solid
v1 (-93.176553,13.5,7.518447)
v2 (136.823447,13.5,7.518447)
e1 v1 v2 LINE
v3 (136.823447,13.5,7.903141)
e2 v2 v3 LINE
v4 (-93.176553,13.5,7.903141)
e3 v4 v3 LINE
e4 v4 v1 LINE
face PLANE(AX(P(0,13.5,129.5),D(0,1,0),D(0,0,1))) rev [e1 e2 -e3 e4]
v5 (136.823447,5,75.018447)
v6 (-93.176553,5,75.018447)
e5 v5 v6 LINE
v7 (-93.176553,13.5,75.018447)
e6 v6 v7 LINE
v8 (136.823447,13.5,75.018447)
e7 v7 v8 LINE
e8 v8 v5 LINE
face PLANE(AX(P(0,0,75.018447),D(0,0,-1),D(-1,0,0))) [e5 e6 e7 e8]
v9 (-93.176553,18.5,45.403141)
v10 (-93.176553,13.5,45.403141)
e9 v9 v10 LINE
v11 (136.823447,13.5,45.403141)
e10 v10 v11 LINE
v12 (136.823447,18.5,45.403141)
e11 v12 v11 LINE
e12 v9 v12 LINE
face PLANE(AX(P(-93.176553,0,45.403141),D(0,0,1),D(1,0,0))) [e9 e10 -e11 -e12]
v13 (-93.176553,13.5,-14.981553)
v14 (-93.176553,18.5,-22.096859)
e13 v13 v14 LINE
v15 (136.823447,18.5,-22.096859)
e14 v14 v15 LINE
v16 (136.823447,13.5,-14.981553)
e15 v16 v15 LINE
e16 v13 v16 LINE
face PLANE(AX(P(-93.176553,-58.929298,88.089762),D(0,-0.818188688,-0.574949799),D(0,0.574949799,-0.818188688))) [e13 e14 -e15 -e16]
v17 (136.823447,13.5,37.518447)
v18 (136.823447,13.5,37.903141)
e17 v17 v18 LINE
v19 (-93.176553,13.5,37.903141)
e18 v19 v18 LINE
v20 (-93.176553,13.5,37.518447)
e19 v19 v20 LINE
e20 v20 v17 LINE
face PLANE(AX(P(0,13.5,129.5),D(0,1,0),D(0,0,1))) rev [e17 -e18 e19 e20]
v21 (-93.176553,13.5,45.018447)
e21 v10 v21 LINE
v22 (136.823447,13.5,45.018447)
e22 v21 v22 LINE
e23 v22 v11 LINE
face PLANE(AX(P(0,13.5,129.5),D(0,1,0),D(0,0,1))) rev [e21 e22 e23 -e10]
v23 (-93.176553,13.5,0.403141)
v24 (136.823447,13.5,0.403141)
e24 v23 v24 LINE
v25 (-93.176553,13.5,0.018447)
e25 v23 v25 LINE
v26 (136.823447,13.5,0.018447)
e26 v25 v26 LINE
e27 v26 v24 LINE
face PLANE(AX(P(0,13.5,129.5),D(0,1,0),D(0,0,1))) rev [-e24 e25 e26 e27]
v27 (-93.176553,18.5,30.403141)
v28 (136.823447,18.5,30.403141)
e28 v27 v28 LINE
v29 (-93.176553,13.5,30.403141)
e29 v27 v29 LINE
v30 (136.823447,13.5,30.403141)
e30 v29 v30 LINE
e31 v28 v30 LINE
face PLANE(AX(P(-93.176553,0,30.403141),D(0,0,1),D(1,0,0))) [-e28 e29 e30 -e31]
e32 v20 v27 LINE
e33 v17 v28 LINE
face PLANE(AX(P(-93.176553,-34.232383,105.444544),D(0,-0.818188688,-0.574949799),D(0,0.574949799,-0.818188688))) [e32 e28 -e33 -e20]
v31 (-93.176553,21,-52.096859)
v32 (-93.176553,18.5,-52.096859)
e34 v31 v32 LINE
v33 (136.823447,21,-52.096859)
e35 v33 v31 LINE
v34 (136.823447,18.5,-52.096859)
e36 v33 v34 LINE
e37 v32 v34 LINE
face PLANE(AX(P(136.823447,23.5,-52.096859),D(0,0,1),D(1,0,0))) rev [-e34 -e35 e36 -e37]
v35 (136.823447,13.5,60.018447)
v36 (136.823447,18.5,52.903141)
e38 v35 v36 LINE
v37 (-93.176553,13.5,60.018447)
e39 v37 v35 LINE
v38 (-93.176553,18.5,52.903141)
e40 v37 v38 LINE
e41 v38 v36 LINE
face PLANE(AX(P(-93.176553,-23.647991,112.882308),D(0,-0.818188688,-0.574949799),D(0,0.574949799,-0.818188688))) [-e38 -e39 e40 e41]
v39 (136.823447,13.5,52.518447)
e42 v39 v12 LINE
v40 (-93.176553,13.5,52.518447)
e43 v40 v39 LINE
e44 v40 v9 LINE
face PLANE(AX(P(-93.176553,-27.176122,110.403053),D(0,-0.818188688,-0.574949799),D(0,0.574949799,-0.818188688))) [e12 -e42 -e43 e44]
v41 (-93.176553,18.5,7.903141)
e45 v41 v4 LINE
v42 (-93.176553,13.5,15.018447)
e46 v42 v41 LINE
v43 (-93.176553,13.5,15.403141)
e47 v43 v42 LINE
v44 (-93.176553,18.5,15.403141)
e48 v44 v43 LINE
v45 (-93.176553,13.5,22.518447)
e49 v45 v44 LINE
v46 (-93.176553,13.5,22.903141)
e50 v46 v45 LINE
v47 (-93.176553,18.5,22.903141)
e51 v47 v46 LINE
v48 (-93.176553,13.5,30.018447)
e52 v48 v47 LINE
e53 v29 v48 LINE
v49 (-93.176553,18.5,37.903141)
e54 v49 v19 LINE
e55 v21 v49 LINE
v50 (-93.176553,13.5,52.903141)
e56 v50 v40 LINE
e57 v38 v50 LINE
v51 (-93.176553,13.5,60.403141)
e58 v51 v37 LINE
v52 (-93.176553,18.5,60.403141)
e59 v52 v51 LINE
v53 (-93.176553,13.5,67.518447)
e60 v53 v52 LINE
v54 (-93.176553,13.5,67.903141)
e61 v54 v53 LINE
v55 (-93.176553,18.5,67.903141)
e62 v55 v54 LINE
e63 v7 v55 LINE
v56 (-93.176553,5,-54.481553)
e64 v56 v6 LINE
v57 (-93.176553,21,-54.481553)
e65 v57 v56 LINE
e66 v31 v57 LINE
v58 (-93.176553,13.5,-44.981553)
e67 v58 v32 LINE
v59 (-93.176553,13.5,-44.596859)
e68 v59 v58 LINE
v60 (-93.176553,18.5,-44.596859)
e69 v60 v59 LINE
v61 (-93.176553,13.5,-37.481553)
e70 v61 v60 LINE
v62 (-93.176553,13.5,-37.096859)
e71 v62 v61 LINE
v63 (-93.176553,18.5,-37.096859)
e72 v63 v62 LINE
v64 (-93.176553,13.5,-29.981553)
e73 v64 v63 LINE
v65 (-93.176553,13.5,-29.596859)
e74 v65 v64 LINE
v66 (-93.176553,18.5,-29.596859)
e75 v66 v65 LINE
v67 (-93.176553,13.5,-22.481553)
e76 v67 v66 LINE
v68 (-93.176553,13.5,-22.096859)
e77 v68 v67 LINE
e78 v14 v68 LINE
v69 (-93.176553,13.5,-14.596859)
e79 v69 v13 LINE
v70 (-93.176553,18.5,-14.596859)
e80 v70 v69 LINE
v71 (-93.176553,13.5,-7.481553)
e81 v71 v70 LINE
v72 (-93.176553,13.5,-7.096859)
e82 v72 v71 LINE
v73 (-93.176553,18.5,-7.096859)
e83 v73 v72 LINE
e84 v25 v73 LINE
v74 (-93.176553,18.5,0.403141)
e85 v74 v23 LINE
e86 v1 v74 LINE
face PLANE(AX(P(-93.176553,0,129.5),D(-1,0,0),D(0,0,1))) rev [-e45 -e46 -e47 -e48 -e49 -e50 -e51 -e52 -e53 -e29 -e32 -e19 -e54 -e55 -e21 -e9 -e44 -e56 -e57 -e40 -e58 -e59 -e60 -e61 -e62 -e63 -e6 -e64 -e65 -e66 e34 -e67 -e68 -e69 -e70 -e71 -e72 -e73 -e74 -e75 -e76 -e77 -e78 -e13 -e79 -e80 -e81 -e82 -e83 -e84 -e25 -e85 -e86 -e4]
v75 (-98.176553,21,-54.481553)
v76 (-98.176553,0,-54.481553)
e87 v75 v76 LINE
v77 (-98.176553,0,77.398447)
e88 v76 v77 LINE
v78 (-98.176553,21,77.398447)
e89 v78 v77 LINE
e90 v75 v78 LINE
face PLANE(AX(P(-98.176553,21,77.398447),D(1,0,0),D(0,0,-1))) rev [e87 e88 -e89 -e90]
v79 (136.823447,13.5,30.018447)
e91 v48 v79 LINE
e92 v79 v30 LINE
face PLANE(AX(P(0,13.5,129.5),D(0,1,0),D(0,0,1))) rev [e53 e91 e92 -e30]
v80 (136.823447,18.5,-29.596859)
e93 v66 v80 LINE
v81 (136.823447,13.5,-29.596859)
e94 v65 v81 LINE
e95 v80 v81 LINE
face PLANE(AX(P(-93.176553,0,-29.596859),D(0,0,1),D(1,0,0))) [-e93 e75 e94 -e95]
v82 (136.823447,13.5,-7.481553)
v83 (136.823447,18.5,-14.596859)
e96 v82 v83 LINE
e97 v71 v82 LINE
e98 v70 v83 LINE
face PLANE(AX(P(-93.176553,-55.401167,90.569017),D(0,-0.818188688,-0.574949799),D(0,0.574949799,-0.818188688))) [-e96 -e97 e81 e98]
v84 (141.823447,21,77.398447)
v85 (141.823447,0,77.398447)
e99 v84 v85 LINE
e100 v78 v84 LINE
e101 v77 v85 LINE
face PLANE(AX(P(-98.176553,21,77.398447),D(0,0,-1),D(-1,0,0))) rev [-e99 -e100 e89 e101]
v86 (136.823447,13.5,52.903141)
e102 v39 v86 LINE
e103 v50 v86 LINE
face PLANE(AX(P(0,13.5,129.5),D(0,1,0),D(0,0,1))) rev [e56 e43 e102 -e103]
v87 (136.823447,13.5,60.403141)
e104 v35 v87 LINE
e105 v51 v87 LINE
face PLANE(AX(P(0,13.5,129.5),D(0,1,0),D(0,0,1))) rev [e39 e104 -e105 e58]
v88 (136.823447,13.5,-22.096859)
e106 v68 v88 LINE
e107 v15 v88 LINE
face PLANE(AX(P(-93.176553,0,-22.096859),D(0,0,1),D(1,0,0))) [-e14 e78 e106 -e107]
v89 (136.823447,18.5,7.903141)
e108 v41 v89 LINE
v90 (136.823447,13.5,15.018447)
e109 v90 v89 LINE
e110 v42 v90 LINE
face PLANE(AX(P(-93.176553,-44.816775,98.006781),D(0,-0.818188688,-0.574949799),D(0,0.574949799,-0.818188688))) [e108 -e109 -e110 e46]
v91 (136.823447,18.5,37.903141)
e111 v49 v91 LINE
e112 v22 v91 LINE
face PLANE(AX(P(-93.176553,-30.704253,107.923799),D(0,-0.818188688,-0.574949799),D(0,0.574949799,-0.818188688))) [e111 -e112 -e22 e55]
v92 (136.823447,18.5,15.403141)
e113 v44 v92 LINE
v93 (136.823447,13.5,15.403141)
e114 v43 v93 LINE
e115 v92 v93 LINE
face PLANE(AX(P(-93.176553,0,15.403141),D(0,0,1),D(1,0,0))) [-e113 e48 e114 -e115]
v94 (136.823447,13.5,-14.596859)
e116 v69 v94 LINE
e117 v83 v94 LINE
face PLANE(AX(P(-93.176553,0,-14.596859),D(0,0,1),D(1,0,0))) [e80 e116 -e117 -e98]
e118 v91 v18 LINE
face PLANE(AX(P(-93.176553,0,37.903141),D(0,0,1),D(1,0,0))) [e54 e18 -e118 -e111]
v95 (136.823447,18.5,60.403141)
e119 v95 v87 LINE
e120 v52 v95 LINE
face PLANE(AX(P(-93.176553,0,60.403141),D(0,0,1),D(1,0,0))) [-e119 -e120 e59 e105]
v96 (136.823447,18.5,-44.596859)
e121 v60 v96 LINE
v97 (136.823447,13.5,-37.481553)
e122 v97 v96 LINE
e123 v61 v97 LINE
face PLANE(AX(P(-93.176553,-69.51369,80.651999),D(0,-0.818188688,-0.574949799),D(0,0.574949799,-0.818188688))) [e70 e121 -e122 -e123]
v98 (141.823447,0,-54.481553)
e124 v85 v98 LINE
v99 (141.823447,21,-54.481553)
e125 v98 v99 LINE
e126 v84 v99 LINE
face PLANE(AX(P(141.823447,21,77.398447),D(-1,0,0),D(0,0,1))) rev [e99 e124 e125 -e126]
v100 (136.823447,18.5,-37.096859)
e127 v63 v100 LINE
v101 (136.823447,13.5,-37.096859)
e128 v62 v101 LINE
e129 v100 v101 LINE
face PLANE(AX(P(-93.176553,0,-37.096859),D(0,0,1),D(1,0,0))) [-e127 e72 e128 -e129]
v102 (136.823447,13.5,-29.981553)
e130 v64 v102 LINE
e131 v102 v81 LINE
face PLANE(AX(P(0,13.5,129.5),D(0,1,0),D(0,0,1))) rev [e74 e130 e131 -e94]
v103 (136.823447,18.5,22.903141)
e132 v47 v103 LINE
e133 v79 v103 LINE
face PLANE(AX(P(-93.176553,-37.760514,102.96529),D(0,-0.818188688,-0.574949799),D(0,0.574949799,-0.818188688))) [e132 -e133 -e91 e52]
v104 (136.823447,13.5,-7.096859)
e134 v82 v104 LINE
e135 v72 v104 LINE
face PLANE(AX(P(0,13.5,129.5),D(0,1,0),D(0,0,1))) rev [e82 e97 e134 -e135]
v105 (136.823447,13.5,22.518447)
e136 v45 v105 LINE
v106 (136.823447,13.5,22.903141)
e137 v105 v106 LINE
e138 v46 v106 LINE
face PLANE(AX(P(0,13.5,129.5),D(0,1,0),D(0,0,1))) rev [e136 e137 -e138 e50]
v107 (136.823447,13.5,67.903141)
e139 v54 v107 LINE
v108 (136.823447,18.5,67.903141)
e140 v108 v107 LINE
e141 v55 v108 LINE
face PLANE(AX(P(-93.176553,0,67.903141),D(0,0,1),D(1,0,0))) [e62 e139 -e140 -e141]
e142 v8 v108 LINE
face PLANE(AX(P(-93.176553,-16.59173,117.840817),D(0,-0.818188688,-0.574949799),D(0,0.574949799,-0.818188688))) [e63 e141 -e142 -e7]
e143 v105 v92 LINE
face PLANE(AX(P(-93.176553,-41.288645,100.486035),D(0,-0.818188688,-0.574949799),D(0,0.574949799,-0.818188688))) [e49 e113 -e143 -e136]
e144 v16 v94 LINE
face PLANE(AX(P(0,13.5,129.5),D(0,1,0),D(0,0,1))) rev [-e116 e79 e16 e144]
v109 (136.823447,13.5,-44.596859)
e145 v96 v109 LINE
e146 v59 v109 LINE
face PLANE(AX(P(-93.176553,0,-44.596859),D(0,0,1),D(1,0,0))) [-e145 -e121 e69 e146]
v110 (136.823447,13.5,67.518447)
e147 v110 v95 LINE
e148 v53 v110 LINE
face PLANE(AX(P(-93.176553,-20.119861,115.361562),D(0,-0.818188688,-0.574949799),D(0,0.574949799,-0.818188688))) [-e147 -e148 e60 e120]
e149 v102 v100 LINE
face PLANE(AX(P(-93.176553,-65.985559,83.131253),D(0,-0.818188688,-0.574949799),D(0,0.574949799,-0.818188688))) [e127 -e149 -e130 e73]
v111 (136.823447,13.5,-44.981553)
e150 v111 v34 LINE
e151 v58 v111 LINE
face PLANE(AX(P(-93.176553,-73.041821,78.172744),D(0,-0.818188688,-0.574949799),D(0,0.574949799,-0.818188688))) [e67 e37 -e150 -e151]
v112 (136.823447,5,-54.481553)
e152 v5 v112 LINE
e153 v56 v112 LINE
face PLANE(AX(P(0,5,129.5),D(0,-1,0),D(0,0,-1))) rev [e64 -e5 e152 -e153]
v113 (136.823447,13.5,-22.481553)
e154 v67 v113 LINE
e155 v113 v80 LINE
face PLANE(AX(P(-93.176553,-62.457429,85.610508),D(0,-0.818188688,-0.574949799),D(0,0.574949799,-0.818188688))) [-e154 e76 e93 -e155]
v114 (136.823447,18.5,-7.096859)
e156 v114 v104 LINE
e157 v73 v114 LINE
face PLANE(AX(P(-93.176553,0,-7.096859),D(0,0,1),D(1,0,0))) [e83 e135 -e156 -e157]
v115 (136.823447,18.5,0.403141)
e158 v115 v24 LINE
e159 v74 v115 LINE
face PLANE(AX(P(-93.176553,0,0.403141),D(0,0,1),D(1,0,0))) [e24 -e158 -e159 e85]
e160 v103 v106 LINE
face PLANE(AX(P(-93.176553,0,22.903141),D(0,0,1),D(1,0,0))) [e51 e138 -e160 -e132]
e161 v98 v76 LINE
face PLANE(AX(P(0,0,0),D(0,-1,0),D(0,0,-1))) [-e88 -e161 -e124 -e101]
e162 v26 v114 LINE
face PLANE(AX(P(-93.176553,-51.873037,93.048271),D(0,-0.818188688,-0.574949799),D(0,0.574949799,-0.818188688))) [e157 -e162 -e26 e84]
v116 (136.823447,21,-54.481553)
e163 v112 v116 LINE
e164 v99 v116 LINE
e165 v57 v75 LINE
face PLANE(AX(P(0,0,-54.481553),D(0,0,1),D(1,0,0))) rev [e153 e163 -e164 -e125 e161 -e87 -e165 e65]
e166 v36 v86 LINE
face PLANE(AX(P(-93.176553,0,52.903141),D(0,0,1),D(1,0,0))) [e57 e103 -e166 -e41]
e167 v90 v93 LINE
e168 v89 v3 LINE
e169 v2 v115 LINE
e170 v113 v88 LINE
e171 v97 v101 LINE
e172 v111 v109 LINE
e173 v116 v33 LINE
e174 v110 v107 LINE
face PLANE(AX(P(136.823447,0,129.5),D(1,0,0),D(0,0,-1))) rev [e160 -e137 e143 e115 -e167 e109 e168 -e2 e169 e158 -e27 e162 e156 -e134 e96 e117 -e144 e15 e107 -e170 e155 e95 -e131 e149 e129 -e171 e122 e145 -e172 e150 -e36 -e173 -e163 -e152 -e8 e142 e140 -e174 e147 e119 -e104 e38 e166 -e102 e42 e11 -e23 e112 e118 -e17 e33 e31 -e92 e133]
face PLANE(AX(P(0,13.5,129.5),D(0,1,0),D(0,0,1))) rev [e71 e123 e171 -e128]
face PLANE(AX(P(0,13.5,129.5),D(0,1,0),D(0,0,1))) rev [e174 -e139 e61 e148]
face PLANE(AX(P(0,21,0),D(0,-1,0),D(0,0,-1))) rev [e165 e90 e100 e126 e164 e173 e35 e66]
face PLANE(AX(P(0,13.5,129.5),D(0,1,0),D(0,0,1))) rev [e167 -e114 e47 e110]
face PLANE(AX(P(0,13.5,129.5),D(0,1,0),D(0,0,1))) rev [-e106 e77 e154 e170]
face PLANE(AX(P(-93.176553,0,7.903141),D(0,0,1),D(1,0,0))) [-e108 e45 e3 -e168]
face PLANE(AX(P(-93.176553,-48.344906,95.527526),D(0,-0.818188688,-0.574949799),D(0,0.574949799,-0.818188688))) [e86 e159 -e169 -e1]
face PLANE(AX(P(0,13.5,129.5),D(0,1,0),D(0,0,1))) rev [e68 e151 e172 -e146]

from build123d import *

# Parameters (mm, degrees)
SKETCH1_W           = 240
SKETCH1_H           = 351.15
BOSS_EXTRUDE3_DEPTH = 21
SKETCH5_W           = 248.975913499
SKETCH5_H           = 113.170869772
CUT_EXTRUDE5_DEPTH  = 254
CAVITY1_START       = -93.176553254
CAVITY1_DEPTH       = 230
SKETCH6_W           = 230
SKETCH6_H           = 2.384694545
CUT_EXTRUDE6_DEPTH  = 10


with BuildPart() as part:
    # Sketch1 → Boss-Extrude3 (new body)
    with BuildSketch(Plane(origin=(0, 0, 0), x_dir=(1, 0, 0), z_dir=(0, 1, 0))):
        with Locations((21.823446746, 98.176553254)):
            Rectangle(SKETCH1_W, SKETCH1_H)
    extrude(amount=BOSS_EXTRUDE3_DEPTH)

    # Sketch5 → Cut-Extrude5 (cut)
    with BuildSketch(Plane(origin=(0, 0, -54.481553254), x_dir=(-1, 0, 0), z_dir=(0, 0, -1))):
        with Locations((-20.8478358, 4.110963623)):
            Rectangle(SKETCH5_W, SKETCH5_H)
    extrude(amount=CUT_EXTRUDE5_DEPTH, mode=Mode.SUBTRACT)

    # Cavity1: read off the stored shape, not the designer's step
    # Cavity1 outline → Cavity1 (cut)
    with BuildSketch(Plane.YZ.offset(CAVITY1_START)):
        Polygon((18.5, 60.403141291), (13.5, 67.518446746), (13.5, 67.903141291), (18.5, 67.903141291), (13.5, 75.018446746), (5, 75.018446746), (5, -54.481553254), (13.5, -54.481553254), (13.5, -52.096858709), (18.5, -52.096858709), (13.5, -44.981553254), (13.5, -44.596858709), (18.5, -44.596858709), (13.5, -37.481553254), (13.5, -37.096858709), (18.5, -37.096858709), (13.5, -29.981553254), (13.5, -29.596858709), (18.5, -29.596858709), (13.5, -22.481553254), (13.5, -22.096858709), (18.5, -22.096858709), (13.5, -14.981553254), (13.5, -14.596858709), (18.5, -14.596858709), (13.5, -7.481553254), (13.5, -7.096858709), (18.5, -7.096858709), (13.5, 0.018446746), (13.5, 0.403141291), (18.5, 0.403141291), (13.5, 7.518446746), (13.5, 7.903141291), (18.5, 7.903141291), (13.5, 15.018446746), (13.5, 15.403141291), (18.5, 15.403141291), (13.5, 22.518446746), (13.5, 22.903141291), (18.5, 22.903141291), (13.5, 30.018446746), (13.5, 30.403141291), (18.5, 30.403141291), (13.5, 37.518446746), (13.5, 37.903141291), (18.5, 37.903141291), (13.5, 45.018446746), (13.5, 45.403141291), (18.5, 45.403141291), (13.5, 52.518446746), (13.5, 52.903141291), (18.5, 52.903141291), (13.5, 60.018446746), (13.5, 60.403141291), align=None)
    extrude(amount=CAVITY1_DEPTH, mode=Mode.SUBTRACT)

    # Sketch6 → Cut-Extrude6 (cut)
    with BuildSketch(Plane(origin=(0, 13.5, 0), x_dir=(-1, 0, 0), z_dir=(0, -1, 0))):
        with Locations((-21.823446746, 53.289205982)):
            Rectangle(SKETCH6_W, SKETCH6_H)
    extrude(amount=-CUT_EXTRUDE6_DEPTH, mode=Mode.SUBTRACT)


solid = part.part
